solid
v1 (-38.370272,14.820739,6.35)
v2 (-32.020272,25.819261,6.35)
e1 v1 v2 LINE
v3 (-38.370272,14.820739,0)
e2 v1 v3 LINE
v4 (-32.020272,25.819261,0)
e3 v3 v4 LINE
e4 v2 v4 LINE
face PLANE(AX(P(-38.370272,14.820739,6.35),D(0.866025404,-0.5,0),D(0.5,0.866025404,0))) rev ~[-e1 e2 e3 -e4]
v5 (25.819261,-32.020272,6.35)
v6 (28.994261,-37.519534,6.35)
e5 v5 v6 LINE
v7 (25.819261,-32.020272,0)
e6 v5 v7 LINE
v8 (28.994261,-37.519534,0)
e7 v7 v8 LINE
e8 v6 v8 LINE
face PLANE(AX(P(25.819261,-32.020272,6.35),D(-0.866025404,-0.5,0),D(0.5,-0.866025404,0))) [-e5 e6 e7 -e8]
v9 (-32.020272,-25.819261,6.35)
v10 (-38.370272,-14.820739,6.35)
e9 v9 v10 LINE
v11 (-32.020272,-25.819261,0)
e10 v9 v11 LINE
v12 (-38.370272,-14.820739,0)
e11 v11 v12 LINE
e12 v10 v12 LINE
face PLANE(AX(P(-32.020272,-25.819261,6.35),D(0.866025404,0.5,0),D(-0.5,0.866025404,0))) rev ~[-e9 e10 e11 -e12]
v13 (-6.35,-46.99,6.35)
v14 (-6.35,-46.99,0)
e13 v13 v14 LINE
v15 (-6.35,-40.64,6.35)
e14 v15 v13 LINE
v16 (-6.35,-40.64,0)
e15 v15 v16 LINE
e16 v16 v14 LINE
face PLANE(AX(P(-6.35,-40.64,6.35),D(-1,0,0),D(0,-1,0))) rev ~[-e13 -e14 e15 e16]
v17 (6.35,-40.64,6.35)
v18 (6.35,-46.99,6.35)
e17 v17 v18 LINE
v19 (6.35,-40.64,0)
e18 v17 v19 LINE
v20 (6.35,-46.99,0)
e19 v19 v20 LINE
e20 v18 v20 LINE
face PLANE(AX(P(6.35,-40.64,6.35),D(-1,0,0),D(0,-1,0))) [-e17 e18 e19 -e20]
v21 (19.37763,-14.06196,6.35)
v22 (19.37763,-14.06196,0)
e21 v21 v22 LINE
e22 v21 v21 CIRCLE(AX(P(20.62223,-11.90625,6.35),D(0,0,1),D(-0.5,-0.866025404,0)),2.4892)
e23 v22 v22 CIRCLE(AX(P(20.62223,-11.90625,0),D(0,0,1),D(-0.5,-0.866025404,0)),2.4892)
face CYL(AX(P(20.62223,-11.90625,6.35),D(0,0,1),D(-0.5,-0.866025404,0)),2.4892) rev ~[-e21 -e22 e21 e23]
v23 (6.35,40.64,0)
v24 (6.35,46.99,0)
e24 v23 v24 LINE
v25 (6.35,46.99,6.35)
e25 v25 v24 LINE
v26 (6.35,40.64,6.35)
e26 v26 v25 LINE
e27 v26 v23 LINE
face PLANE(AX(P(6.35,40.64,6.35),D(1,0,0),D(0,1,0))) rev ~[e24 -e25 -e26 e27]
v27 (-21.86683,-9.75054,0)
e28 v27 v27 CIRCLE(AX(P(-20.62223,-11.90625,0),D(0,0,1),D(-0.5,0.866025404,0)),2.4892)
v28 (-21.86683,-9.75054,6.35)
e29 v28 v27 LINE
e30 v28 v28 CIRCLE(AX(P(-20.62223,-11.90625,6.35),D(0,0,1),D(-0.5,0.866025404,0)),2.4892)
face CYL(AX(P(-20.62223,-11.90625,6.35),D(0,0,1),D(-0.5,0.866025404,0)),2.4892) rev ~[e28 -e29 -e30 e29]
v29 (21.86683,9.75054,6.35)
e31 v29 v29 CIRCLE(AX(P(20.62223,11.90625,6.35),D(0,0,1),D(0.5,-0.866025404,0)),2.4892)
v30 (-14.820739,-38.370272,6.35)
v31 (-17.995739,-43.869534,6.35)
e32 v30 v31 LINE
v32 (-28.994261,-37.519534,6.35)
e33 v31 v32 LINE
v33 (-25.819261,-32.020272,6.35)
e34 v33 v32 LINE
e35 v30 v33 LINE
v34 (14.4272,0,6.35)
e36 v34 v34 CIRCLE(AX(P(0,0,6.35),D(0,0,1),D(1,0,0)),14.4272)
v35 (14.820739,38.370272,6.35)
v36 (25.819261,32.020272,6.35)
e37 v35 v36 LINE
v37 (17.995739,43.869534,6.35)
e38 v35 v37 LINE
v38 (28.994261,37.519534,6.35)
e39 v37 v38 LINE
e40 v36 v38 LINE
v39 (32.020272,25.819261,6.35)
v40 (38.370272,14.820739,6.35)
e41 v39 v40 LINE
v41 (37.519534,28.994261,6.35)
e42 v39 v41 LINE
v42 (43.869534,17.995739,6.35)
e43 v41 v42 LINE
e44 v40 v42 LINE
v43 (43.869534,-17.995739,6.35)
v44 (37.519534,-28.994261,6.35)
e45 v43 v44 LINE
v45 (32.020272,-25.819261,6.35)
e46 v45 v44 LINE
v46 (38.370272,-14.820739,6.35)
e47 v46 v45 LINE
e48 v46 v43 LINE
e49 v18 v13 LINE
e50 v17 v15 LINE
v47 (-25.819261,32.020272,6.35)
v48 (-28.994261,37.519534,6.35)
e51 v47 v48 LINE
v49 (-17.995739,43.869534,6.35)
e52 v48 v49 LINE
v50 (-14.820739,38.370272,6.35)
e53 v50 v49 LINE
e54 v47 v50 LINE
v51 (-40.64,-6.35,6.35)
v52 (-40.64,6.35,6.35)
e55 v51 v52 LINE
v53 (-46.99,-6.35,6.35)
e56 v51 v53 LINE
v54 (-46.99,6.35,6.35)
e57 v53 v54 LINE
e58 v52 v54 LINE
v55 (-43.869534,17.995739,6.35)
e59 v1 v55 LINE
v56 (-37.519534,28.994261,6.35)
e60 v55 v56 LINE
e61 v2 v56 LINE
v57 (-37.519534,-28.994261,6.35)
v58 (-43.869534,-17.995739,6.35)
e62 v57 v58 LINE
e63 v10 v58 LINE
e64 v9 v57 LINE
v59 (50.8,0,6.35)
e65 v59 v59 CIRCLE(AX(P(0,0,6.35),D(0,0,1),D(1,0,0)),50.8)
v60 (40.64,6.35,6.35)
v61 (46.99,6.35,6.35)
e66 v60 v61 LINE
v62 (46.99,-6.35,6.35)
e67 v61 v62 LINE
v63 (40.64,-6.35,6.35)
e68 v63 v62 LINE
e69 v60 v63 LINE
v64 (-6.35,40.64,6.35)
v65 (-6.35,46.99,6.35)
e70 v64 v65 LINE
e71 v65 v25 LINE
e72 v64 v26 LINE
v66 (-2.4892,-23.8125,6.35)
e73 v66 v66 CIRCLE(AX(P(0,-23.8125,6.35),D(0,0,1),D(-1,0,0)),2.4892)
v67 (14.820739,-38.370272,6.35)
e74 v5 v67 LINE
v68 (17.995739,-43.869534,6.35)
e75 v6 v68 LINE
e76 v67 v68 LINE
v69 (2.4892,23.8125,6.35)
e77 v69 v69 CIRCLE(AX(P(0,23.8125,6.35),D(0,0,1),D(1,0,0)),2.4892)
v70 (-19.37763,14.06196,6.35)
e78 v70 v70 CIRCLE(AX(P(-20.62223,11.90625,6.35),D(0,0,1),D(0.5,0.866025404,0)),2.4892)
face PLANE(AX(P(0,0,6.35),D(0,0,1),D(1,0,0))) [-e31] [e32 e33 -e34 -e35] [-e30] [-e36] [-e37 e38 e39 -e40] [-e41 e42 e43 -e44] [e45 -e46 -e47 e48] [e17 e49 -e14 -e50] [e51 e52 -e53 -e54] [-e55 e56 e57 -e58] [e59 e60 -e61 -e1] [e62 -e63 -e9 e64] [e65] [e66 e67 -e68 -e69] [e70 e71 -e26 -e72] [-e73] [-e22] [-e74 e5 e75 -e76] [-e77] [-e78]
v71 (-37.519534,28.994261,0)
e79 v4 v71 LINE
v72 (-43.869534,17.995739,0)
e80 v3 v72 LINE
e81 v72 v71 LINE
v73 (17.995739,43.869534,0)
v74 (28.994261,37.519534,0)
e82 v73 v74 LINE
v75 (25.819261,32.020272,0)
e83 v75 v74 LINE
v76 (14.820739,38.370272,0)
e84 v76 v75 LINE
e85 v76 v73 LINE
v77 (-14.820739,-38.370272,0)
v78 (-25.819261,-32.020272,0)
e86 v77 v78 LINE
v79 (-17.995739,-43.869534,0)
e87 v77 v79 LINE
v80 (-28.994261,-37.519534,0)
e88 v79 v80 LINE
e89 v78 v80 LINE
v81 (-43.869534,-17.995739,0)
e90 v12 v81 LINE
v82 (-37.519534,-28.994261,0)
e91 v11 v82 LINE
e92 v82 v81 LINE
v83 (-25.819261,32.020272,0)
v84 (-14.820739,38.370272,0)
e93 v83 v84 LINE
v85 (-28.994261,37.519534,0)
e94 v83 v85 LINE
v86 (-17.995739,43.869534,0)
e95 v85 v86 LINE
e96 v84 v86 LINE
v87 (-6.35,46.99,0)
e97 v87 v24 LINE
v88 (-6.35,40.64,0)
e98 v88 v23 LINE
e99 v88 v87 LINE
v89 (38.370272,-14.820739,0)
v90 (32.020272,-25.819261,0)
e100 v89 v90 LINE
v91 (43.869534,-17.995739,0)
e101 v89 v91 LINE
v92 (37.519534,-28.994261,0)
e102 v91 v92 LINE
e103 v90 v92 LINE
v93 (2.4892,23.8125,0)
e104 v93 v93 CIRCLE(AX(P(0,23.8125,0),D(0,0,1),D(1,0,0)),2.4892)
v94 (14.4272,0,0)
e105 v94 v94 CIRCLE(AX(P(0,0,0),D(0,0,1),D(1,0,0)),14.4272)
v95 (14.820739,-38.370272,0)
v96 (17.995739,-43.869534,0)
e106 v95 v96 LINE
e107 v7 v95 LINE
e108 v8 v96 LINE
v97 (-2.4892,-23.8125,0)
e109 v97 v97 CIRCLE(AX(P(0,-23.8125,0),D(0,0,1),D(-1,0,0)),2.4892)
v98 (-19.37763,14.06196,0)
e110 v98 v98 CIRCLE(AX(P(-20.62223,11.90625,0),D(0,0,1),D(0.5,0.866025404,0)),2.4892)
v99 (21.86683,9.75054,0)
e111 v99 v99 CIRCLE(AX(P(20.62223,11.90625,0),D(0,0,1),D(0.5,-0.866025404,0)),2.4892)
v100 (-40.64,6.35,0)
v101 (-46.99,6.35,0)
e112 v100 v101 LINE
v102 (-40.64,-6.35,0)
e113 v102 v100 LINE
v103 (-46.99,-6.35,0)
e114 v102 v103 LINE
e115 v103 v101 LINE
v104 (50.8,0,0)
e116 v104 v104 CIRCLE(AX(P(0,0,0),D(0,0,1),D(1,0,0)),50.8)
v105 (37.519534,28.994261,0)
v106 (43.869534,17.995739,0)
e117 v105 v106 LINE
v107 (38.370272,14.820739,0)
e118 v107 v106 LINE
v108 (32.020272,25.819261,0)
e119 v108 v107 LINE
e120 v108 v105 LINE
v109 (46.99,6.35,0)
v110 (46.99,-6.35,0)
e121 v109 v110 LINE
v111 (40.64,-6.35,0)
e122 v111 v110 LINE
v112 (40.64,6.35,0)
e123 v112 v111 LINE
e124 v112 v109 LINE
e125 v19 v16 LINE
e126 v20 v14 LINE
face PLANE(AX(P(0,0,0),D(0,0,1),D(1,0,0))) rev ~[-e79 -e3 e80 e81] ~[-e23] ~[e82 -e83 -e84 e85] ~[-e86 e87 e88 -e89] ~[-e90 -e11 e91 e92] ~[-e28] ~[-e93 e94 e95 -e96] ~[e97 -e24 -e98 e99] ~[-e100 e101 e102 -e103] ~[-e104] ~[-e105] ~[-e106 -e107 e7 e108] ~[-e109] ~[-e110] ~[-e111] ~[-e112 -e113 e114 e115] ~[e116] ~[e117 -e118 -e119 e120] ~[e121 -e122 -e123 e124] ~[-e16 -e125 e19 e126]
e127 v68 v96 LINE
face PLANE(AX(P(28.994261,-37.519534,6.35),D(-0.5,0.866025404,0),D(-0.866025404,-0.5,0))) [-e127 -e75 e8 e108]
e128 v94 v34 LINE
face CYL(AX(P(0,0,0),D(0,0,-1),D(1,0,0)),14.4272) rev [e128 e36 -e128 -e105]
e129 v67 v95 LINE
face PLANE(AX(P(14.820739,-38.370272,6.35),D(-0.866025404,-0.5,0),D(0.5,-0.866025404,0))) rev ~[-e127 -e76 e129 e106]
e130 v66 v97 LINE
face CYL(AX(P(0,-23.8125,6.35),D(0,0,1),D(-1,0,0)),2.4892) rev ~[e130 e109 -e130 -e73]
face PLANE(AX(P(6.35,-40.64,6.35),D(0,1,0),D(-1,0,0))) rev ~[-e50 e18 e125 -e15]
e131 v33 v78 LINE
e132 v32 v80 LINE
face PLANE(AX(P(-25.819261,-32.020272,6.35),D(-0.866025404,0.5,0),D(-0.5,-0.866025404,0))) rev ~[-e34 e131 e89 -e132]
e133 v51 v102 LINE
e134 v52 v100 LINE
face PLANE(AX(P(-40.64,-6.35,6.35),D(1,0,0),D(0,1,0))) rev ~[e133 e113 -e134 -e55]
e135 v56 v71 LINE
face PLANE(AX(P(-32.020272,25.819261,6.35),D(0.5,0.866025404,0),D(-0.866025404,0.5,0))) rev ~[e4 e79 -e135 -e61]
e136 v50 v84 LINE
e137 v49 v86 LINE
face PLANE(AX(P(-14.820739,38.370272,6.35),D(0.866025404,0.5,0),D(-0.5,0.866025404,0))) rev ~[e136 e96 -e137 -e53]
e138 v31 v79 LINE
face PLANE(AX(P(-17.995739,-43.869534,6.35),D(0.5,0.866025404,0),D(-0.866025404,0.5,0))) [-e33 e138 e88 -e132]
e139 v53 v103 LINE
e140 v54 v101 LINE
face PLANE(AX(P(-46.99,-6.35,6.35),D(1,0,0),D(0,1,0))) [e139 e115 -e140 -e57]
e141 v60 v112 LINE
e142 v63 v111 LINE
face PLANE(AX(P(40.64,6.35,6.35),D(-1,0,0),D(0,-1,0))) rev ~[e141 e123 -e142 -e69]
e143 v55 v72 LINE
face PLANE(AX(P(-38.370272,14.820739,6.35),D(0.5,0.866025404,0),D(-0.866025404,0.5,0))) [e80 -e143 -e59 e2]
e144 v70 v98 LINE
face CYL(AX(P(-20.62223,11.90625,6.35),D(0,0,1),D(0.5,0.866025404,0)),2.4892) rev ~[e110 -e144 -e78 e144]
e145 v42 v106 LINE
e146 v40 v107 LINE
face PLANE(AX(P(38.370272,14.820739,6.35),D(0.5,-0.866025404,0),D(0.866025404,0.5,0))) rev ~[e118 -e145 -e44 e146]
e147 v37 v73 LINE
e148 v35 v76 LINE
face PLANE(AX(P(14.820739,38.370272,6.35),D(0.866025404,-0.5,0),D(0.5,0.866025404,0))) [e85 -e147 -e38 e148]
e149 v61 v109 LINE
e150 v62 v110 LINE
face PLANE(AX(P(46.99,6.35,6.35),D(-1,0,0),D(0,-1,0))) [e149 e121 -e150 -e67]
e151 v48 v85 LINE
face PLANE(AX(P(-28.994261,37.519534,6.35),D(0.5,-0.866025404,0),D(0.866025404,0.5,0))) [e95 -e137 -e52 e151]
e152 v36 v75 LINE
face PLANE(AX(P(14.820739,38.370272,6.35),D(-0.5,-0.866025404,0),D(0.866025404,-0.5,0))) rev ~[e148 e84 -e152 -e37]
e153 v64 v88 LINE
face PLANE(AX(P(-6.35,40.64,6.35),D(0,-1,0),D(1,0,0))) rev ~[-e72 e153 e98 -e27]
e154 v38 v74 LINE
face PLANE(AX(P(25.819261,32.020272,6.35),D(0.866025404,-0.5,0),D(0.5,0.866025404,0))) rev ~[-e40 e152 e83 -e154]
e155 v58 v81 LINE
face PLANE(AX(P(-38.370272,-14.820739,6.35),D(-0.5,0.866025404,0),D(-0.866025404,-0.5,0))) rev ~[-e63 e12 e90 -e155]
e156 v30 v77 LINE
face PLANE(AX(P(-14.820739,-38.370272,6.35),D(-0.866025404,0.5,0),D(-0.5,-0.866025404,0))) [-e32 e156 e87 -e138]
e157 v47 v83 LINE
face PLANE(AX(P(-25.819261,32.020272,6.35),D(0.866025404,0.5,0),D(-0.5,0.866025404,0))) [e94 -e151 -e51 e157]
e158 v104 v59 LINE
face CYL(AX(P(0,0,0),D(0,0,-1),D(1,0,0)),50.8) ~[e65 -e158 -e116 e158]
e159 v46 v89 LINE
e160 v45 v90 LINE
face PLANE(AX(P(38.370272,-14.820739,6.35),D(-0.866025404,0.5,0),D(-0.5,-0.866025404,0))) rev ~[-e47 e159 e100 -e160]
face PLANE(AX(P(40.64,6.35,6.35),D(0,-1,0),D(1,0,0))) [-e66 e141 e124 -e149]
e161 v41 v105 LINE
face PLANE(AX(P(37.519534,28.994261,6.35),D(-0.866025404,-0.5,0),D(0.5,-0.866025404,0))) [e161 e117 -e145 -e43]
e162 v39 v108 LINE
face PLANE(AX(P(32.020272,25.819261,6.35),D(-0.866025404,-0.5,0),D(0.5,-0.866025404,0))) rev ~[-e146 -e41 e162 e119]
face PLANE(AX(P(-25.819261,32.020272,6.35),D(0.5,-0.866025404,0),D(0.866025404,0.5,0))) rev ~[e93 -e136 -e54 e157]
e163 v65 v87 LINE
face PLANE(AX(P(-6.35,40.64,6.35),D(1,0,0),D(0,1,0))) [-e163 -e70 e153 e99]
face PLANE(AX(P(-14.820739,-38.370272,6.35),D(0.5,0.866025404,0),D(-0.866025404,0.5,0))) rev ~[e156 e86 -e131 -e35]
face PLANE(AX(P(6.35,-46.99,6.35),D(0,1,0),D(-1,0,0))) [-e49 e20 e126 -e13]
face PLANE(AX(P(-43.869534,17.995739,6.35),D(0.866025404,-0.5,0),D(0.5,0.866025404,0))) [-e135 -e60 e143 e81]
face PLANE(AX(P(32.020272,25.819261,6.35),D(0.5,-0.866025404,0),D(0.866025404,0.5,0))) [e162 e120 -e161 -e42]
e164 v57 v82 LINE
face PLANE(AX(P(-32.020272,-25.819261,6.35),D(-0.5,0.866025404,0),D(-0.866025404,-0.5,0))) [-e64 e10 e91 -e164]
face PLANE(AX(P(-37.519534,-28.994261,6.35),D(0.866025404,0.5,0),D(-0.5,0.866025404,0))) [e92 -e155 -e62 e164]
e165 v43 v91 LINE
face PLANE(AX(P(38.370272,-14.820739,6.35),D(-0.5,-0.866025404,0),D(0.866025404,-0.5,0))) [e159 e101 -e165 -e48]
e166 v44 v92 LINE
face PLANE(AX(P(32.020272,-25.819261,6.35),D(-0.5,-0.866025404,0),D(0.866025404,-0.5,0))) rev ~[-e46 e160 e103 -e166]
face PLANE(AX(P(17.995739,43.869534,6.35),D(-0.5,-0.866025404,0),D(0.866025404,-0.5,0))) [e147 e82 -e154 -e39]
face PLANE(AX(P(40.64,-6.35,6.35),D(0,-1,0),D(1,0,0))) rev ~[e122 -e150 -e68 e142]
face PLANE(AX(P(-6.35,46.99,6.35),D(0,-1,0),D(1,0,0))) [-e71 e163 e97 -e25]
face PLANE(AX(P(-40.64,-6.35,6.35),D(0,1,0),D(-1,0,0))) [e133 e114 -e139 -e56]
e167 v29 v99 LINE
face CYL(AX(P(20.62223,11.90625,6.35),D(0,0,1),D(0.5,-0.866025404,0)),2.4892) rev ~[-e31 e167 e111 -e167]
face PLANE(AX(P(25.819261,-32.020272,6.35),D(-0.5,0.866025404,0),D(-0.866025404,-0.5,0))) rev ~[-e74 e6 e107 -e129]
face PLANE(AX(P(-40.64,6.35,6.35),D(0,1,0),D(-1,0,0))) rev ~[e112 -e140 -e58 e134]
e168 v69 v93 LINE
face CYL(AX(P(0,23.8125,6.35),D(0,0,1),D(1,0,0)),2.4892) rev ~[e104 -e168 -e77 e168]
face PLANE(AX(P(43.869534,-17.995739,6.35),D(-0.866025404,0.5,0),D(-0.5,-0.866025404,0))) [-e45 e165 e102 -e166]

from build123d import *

# Parameters (mm, degrees)
F0_R            = 50.8
F0_R_2          = 14.4272
F1_DEPTH        = 6.35
F2_W            = 12.7
F2_H            = 6.35
F3_DEPTH        = 6.351
F3_COPIES_COUNT = 12
F4_R            = 2.4892
F5_DEPTH        = 6.351
F5_COPIES_COUNT = 6


# Not quite as in the source:
# - a pattern or mirror of a feature is missing from the dataset's text; its kind, count and spacing are read off the source's solid


with BuildPart() as f1:
    # F0 (on Top) → F1 (new body)
    with BuildSketch(Plane.XY):
        Circle(F0_R)
        Circle(F0_R_2, mode=Mode.SUBTRACT)
    extrude(amount=F1_DEPTH)

    # F2 (on face) → F3 (cut, through all)
    with BuildSketch(Plane.XY.offset(6.35)):
        with Locations((0, 43.815)):
            Rectangle(F2_W, F2_H)
    f3 = extrude(amount=-F3_DEPTH, mode=Mode.SUBTRACT)

    # F3_copies: F3 ×12 about axis
    f3_copies_axis = Axis((0, 0, 0), (0, 0, 1))
    for i in range(1, F3_COPIES_COUNT):
        add(f3.rotate(f3_copies_axis, i * 360 / F3_COPIES_COUNT), mode=Mode.SUBTRACT)

    # F4 (on face) → F5 (cut, through all)
    with BuildSketch(Plane.XY.offset(6.35)):
        with Locations((0, 23.8125)):
            Circle(F4_R)
    f5 = extrude(amount=-F5_DEPTH, mode=Mode.SUBTRACT)

    # F5_copies: F5 ×6 about axis
    f5_copies_axis = Axis((0, 0, 0), (0, 0, 1))
    for i in range(1, F5_COPIES_COUNT):
        add(f5.rotate(f5_copies_axis, i * 360 / F5_COPIES_COUNT), mode=Mode.SUBTRACT)


solid = f1.part
